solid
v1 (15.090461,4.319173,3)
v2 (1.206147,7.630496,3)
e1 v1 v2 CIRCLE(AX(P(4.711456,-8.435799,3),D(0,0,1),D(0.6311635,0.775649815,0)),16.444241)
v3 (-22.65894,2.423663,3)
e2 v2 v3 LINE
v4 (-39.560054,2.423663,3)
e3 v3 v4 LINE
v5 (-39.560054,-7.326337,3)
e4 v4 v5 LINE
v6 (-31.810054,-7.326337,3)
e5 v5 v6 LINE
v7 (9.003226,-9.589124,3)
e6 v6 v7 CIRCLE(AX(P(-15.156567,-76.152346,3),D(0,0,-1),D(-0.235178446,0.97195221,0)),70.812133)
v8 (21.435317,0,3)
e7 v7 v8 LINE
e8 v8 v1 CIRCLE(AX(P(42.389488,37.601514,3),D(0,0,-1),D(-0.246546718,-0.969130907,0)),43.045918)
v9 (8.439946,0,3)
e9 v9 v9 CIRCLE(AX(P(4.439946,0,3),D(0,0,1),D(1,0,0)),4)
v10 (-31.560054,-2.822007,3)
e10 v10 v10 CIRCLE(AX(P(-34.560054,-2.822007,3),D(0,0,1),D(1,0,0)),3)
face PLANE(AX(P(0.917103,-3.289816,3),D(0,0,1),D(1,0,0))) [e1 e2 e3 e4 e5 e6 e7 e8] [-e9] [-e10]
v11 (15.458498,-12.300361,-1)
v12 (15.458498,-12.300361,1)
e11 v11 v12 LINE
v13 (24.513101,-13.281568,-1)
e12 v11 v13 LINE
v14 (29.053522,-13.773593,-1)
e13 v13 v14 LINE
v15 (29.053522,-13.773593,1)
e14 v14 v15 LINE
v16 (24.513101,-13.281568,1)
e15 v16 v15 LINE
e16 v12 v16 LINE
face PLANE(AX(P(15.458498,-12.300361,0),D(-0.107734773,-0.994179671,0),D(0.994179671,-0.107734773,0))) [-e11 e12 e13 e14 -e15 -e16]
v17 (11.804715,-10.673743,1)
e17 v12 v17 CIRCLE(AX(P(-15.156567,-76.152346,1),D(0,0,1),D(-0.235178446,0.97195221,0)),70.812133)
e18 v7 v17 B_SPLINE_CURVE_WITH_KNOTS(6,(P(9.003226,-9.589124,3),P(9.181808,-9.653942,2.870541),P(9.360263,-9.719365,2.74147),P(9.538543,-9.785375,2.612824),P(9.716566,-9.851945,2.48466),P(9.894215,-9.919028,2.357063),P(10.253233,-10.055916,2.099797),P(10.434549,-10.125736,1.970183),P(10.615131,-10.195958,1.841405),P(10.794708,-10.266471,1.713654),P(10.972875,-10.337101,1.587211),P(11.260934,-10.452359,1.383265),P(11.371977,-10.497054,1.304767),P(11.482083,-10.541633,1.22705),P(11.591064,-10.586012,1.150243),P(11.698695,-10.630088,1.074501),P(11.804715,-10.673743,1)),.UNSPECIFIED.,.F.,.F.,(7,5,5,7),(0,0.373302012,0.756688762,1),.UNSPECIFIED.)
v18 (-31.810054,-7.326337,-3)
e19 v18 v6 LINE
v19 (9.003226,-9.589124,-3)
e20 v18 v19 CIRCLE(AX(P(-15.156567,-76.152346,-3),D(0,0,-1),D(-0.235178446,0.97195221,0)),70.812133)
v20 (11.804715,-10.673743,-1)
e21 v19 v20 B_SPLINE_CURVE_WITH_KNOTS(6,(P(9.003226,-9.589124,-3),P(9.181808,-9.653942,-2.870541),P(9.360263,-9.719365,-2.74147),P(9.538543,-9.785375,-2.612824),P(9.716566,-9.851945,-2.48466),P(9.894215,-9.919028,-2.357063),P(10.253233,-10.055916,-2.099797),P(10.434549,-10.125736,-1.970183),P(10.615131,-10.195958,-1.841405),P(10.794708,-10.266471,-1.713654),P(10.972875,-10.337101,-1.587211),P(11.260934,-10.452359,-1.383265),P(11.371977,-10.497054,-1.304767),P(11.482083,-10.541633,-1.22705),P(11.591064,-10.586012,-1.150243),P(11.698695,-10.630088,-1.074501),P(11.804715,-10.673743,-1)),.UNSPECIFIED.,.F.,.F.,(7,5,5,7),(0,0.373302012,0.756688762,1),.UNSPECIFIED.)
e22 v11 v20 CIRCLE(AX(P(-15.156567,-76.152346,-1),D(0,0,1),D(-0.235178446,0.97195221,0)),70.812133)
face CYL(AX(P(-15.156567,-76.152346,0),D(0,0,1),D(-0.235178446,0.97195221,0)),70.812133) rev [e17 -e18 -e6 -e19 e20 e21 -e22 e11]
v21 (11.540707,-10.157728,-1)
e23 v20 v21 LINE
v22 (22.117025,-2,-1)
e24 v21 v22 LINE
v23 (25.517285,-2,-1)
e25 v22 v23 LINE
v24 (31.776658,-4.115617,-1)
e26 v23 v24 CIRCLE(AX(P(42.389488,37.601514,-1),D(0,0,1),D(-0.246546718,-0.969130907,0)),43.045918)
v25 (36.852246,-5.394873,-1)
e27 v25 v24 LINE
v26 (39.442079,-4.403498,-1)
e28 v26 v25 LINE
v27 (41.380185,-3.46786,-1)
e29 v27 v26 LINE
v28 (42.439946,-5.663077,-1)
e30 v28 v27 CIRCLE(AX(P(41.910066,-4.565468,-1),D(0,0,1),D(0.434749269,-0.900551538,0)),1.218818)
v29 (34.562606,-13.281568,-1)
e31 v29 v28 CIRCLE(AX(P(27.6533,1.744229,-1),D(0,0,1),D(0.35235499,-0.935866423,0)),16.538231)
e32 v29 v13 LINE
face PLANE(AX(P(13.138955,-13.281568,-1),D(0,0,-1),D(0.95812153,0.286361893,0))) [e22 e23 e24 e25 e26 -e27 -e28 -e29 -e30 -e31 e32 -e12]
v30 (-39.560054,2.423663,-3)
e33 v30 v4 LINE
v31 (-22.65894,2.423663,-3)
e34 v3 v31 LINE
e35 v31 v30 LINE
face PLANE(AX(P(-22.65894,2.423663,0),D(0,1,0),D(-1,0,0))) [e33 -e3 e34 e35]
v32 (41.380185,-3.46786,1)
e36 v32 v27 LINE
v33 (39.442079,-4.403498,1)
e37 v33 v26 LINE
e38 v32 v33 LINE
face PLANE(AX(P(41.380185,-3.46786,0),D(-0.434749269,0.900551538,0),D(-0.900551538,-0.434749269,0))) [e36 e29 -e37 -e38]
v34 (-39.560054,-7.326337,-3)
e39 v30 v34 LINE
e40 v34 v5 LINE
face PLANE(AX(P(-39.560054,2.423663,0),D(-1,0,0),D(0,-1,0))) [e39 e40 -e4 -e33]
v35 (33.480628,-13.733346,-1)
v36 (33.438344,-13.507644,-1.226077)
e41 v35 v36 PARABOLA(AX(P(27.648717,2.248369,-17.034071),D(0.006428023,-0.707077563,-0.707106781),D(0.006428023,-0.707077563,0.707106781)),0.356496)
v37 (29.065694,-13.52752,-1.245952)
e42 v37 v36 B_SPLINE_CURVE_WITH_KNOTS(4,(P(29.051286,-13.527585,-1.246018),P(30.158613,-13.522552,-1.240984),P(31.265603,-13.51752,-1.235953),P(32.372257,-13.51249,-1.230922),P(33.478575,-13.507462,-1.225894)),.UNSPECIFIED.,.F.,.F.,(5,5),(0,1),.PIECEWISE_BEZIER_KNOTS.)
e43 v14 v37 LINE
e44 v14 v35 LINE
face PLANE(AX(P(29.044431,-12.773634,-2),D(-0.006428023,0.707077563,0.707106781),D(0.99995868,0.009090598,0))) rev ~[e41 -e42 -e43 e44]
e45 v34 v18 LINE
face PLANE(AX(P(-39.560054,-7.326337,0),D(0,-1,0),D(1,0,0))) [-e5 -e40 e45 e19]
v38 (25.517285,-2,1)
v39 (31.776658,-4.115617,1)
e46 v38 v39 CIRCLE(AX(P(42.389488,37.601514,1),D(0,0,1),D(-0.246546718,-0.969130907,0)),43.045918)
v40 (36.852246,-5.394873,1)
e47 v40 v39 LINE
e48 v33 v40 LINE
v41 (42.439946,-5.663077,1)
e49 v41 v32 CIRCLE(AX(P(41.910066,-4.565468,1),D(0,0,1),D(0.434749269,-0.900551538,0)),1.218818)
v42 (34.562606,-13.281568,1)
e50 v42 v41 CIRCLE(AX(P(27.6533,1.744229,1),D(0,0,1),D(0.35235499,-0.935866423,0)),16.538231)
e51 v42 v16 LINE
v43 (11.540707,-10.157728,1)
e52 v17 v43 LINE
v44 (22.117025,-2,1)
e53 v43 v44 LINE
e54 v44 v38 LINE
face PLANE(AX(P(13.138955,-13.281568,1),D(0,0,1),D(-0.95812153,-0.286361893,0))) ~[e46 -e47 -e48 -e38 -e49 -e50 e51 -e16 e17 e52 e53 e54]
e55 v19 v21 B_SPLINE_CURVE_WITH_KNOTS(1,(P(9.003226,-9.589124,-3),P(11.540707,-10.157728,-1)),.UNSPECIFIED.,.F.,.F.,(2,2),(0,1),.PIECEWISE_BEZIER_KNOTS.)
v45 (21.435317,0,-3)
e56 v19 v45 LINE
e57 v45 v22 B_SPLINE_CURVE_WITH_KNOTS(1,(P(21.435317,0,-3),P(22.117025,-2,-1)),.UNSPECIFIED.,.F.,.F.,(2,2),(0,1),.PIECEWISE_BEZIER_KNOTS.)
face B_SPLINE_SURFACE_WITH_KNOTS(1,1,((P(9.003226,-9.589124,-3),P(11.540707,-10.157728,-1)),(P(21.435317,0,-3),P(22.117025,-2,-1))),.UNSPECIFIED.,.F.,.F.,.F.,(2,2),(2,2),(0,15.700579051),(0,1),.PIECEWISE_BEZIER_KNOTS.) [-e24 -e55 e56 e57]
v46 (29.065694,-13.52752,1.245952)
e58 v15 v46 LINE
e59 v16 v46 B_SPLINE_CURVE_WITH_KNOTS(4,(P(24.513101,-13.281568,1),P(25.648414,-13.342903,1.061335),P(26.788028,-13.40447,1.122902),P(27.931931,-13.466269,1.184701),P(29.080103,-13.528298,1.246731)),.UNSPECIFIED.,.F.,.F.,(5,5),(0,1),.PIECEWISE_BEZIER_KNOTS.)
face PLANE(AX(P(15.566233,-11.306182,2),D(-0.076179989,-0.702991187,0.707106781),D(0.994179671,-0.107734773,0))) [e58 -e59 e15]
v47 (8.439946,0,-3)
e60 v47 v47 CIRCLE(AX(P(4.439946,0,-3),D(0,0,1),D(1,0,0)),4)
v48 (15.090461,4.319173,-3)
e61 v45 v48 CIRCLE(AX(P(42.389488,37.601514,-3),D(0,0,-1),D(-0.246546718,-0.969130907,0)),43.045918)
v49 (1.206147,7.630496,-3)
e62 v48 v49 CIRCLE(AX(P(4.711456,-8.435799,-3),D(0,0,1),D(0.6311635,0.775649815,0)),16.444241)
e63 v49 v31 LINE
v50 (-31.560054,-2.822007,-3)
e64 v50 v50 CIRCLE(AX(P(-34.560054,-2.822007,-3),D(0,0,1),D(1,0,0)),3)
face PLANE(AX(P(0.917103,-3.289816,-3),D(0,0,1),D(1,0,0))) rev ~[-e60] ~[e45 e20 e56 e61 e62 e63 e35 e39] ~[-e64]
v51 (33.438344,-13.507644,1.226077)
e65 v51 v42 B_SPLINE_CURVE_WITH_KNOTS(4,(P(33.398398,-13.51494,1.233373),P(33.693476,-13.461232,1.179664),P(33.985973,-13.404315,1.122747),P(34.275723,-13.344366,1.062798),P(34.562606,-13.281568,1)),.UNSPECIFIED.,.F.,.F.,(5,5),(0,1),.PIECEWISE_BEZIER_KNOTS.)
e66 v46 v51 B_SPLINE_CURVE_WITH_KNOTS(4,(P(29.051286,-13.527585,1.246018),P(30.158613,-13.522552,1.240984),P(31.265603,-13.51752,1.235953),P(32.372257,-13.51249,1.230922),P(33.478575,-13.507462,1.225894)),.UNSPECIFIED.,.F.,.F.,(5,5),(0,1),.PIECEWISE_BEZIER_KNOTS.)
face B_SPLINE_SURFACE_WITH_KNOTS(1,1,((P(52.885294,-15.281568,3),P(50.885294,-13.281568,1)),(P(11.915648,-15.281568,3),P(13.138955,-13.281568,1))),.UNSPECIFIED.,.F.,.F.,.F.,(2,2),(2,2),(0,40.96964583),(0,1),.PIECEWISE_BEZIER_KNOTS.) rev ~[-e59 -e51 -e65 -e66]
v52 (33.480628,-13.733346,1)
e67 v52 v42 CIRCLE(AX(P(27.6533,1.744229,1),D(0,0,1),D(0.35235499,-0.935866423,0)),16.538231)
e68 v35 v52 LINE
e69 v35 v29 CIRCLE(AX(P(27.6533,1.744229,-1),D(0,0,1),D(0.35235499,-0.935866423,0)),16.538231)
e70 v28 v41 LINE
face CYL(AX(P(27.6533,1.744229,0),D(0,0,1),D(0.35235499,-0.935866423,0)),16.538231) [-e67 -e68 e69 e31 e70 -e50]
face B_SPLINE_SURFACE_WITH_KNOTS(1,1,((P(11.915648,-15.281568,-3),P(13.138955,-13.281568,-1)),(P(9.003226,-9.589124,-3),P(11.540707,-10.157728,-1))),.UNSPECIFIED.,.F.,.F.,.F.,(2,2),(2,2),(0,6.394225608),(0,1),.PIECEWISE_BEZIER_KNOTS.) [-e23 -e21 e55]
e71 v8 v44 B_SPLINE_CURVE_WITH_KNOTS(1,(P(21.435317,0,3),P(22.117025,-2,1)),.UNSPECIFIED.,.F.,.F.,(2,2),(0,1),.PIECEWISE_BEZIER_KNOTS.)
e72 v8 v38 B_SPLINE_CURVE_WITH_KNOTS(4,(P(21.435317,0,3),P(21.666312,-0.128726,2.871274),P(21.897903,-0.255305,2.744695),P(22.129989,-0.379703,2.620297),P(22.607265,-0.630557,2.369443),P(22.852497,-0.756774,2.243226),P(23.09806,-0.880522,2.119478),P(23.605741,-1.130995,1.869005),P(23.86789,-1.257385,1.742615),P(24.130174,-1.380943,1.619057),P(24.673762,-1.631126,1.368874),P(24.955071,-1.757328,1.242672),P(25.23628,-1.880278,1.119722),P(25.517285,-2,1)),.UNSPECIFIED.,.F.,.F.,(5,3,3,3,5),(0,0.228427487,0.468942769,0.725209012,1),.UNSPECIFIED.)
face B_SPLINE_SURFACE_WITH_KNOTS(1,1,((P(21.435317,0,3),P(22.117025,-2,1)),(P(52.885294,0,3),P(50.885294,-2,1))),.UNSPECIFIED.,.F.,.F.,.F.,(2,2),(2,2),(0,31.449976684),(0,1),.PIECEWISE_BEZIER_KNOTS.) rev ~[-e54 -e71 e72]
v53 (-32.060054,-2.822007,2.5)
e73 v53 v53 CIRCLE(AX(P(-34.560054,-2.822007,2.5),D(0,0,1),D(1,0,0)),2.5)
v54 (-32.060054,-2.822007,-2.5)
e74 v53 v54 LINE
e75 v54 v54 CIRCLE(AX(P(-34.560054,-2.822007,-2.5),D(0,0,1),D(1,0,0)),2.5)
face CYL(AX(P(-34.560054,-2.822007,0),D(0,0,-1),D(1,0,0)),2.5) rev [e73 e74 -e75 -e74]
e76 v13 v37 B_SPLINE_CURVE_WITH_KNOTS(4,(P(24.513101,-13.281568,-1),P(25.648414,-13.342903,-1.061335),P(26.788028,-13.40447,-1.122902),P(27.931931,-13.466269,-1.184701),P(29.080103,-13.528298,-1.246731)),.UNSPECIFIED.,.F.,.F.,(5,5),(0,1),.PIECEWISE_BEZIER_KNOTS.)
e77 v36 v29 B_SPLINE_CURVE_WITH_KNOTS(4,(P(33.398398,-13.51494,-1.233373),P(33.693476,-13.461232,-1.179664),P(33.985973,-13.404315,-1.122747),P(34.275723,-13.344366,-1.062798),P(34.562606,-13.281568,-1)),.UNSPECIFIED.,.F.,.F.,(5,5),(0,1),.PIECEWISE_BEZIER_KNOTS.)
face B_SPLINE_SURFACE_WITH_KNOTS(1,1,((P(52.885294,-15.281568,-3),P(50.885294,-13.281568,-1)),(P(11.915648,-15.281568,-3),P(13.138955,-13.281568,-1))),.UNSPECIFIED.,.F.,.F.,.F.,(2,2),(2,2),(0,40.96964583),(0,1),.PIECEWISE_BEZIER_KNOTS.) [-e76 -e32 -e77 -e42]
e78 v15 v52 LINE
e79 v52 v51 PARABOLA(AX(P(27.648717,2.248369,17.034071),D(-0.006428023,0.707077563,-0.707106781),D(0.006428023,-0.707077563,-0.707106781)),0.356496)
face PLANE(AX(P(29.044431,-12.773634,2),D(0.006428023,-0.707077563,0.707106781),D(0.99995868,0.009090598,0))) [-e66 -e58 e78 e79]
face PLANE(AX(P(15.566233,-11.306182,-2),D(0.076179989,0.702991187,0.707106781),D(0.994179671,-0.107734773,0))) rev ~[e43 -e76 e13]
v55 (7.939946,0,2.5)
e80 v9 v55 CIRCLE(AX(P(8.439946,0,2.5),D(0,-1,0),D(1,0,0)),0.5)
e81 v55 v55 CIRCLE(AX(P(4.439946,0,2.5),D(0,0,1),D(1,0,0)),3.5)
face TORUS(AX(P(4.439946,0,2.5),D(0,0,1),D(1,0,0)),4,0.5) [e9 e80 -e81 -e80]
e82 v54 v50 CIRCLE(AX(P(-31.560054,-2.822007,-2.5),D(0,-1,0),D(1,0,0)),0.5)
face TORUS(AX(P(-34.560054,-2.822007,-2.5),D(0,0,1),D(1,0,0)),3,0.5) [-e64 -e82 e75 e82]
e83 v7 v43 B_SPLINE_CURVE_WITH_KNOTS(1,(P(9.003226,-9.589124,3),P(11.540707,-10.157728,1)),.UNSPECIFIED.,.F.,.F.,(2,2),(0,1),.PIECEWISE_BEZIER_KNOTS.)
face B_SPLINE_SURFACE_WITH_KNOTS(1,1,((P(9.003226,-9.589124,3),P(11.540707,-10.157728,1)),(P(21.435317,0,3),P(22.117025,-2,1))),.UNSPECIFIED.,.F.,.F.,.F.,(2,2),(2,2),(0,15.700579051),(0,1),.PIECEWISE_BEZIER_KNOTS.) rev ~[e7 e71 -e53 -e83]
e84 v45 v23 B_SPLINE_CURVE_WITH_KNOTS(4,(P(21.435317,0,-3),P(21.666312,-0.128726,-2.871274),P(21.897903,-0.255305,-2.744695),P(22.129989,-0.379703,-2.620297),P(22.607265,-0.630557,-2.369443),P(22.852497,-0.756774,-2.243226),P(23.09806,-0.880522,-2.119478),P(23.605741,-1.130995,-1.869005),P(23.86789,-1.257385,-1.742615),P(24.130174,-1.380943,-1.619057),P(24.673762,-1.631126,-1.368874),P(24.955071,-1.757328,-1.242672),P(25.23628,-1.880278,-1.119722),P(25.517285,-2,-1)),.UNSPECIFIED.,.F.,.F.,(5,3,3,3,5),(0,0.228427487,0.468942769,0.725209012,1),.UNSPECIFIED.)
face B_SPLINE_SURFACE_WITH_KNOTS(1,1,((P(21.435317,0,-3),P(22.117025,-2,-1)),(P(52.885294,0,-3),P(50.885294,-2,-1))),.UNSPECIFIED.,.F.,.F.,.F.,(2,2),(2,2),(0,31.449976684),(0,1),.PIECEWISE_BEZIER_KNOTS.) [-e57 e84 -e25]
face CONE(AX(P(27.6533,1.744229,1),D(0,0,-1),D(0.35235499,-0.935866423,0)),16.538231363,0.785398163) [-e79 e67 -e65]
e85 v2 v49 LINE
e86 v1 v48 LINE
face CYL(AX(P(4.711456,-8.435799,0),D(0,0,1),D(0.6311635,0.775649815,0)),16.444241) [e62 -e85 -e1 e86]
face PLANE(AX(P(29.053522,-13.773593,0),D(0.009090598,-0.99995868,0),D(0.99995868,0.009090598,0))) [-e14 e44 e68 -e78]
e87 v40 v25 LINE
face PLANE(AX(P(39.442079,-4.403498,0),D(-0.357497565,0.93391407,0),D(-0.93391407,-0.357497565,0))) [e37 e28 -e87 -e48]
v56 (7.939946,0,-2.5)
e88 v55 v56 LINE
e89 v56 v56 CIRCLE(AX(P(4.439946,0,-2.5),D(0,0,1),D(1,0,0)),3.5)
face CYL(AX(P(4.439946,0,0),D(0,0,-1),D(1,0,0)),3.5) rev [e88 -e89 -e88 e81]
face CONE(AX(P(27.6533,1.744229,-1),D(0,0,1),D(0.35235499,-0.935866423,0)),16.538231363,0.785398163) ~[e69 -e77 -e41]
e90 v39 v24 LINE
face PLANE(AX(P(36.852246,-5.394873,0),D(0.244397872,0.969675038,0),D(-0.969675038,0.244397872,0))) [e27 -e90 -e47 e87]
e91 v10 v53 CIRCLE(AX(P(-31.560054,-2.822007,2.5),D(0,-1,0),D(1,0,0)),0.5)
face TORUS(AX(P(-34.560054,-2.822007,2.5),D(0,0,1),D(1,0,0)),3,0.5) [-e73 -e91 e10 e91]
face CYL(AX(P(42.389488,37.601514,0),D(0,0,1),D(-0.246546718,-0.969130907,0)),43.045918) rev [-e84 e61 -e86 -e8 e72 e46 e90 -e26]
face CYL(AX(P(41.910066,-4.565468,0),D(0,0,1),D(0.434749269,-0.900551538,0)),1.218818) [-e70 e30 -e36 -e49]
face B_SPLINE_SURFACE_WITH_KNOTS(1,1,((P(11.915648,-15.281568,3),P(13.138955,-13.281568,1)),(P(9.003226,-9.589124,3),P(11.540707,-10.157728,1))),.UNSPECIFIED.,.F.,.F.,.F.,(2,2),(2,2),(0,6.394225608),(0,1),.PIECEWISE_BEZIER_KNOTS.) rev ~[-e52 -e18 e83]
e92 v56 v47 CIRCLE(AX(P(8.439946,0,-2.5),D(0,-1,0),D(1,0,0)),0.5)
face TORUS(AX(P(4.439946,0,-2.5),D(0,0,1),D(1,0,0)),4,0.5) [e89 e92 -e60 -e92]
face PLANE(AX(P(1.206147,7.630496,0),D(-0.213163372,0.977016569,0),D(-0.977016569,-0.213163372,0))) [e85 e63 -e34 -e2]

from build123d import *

# Parameters (mm, degrees)
F0_R     = 2.5
F0_R_2   = 3.5
F1_DEPTH = 3
F2_SIZE  = 2
F4_R     = 0.5
F5_DEPTH = 2
F5_TAPER = 45


# Not quite as in the source:
# - a pattern or mirror of a feature is missing from the dataset's text; its kind, count and spacing are read off the source's solid


with BuildPart() as f1:
    # F0 (on Top) → F1 (new body, symmetric)
    with BuildSketch(Plane.XY):
        with BuildLine():
            Line((-22.6589401231, 2.4236629568), (-39.5600539291, 2.4236629568))
            Line((-39.5600539291, 2.4236629568), (-39.5600539291, -7.3263370432))
            Line((-39.5600539291, -7.3263370432), (-31.8100539291, -7.3263370432))
            ThreePointArc((-31.8100539291, -7.3263370432), (-7.74599031, -5.7290436956), (15.4584982429, -12.300361288))
            Line((15.4584982429, -12.300361288), (29.0535219773, -13.773592777))
            Line((29.0535219773, -13.773592777), (33.4806282794, -13.7333460718))
            ThreePointArc((33.4806282794, -13.7333460718), (38.7220078669, -10.5438462203), (42.4399460709, -5.663077347))
            ThreePointArc((42.4399460709, -5.663077347), (43.0076744864, -4.0355880404), (41.3801851798, -3.4678596249))
            Line((41.3801851798, -3.4678596249), (39.4420786101, -4.4034978191))
            Line((39.4420786101, -4.4034978191), (36.8522457248, -5.3948726996))
            Line((36.8522457248, -5.3948726996), (31.776658302, -4.1156165412))
            ThreePointArc((31.776658302, -4.1156165412), (22.9700739727, -0.8151163334), (15.0904607998, 4.3191728497))
            ThreePointArc((15.0904607998, 4.3191728497), (8.5263135264, 7.5598223627), (1.2061465951, 7.6304961974))
            Line((1.2061465951, 7.6304961974), (-22.6589401231, 2.4236629568))
        make_face()
        with Locations((-34.5600539291, -2.8220066844)):
            Circle(F0_R, mode=Mode.SUBTRACT)
        with Locations((4.4399460709, 0)):
            Circle(F0_R_2, mode=Mode.SUBTRACT)
    extrude(amount=F1_DEPTH, both=True)

    # F2
    f2_edges = [f1.edges().sort_by_distance(p)[0] for p in [
        (22.25601, -13.036977, 3),
        (22.25601, -13.036977, -3),
        (31.267075, -13.753469, 3),
        (31.267075, -13.753469, -3),
        (38.722008, -10.543846, 3),
        (38.722008, -10.543846, -3),
    ]]
    chamfer(f2_edges, length=F2_SIZE)

    # F4
    f4_edges = [f1.edges().sort_by_distance(p)[0] for p in [
        (0.939946, 0, -3),
        (-37.060054, -2.822007, -3),
        (-37.060054, -2.822007, 3),
        (0.939946, 0, 3),
    ]]
    fillet(f4_edges, radius=F4_R)

    # F3 (on face) → F5 (cut)
    with BuildSketch(Plane(origin=(0, 0, -3), x_dir=(1, 0, 0), z_dir=(0, 0, -1))):
        Polygon((11.9156481301, 15.2815678021), (9.0032261915, 9.5891237242), (21.4353172765, 0), (52.8852939606, 0), (52.8852939606, 15.2815678021), align=None)
    f5 = extrude(amount=-F5_DEPTH, taper=F5_TAPER, mode=Mode.SUBTRACT)

    # F5_copies: F5 across plane
    add(f5.mirror(Plane.XY), mode=Mode.SUBTRACT)


solid = f1.part
